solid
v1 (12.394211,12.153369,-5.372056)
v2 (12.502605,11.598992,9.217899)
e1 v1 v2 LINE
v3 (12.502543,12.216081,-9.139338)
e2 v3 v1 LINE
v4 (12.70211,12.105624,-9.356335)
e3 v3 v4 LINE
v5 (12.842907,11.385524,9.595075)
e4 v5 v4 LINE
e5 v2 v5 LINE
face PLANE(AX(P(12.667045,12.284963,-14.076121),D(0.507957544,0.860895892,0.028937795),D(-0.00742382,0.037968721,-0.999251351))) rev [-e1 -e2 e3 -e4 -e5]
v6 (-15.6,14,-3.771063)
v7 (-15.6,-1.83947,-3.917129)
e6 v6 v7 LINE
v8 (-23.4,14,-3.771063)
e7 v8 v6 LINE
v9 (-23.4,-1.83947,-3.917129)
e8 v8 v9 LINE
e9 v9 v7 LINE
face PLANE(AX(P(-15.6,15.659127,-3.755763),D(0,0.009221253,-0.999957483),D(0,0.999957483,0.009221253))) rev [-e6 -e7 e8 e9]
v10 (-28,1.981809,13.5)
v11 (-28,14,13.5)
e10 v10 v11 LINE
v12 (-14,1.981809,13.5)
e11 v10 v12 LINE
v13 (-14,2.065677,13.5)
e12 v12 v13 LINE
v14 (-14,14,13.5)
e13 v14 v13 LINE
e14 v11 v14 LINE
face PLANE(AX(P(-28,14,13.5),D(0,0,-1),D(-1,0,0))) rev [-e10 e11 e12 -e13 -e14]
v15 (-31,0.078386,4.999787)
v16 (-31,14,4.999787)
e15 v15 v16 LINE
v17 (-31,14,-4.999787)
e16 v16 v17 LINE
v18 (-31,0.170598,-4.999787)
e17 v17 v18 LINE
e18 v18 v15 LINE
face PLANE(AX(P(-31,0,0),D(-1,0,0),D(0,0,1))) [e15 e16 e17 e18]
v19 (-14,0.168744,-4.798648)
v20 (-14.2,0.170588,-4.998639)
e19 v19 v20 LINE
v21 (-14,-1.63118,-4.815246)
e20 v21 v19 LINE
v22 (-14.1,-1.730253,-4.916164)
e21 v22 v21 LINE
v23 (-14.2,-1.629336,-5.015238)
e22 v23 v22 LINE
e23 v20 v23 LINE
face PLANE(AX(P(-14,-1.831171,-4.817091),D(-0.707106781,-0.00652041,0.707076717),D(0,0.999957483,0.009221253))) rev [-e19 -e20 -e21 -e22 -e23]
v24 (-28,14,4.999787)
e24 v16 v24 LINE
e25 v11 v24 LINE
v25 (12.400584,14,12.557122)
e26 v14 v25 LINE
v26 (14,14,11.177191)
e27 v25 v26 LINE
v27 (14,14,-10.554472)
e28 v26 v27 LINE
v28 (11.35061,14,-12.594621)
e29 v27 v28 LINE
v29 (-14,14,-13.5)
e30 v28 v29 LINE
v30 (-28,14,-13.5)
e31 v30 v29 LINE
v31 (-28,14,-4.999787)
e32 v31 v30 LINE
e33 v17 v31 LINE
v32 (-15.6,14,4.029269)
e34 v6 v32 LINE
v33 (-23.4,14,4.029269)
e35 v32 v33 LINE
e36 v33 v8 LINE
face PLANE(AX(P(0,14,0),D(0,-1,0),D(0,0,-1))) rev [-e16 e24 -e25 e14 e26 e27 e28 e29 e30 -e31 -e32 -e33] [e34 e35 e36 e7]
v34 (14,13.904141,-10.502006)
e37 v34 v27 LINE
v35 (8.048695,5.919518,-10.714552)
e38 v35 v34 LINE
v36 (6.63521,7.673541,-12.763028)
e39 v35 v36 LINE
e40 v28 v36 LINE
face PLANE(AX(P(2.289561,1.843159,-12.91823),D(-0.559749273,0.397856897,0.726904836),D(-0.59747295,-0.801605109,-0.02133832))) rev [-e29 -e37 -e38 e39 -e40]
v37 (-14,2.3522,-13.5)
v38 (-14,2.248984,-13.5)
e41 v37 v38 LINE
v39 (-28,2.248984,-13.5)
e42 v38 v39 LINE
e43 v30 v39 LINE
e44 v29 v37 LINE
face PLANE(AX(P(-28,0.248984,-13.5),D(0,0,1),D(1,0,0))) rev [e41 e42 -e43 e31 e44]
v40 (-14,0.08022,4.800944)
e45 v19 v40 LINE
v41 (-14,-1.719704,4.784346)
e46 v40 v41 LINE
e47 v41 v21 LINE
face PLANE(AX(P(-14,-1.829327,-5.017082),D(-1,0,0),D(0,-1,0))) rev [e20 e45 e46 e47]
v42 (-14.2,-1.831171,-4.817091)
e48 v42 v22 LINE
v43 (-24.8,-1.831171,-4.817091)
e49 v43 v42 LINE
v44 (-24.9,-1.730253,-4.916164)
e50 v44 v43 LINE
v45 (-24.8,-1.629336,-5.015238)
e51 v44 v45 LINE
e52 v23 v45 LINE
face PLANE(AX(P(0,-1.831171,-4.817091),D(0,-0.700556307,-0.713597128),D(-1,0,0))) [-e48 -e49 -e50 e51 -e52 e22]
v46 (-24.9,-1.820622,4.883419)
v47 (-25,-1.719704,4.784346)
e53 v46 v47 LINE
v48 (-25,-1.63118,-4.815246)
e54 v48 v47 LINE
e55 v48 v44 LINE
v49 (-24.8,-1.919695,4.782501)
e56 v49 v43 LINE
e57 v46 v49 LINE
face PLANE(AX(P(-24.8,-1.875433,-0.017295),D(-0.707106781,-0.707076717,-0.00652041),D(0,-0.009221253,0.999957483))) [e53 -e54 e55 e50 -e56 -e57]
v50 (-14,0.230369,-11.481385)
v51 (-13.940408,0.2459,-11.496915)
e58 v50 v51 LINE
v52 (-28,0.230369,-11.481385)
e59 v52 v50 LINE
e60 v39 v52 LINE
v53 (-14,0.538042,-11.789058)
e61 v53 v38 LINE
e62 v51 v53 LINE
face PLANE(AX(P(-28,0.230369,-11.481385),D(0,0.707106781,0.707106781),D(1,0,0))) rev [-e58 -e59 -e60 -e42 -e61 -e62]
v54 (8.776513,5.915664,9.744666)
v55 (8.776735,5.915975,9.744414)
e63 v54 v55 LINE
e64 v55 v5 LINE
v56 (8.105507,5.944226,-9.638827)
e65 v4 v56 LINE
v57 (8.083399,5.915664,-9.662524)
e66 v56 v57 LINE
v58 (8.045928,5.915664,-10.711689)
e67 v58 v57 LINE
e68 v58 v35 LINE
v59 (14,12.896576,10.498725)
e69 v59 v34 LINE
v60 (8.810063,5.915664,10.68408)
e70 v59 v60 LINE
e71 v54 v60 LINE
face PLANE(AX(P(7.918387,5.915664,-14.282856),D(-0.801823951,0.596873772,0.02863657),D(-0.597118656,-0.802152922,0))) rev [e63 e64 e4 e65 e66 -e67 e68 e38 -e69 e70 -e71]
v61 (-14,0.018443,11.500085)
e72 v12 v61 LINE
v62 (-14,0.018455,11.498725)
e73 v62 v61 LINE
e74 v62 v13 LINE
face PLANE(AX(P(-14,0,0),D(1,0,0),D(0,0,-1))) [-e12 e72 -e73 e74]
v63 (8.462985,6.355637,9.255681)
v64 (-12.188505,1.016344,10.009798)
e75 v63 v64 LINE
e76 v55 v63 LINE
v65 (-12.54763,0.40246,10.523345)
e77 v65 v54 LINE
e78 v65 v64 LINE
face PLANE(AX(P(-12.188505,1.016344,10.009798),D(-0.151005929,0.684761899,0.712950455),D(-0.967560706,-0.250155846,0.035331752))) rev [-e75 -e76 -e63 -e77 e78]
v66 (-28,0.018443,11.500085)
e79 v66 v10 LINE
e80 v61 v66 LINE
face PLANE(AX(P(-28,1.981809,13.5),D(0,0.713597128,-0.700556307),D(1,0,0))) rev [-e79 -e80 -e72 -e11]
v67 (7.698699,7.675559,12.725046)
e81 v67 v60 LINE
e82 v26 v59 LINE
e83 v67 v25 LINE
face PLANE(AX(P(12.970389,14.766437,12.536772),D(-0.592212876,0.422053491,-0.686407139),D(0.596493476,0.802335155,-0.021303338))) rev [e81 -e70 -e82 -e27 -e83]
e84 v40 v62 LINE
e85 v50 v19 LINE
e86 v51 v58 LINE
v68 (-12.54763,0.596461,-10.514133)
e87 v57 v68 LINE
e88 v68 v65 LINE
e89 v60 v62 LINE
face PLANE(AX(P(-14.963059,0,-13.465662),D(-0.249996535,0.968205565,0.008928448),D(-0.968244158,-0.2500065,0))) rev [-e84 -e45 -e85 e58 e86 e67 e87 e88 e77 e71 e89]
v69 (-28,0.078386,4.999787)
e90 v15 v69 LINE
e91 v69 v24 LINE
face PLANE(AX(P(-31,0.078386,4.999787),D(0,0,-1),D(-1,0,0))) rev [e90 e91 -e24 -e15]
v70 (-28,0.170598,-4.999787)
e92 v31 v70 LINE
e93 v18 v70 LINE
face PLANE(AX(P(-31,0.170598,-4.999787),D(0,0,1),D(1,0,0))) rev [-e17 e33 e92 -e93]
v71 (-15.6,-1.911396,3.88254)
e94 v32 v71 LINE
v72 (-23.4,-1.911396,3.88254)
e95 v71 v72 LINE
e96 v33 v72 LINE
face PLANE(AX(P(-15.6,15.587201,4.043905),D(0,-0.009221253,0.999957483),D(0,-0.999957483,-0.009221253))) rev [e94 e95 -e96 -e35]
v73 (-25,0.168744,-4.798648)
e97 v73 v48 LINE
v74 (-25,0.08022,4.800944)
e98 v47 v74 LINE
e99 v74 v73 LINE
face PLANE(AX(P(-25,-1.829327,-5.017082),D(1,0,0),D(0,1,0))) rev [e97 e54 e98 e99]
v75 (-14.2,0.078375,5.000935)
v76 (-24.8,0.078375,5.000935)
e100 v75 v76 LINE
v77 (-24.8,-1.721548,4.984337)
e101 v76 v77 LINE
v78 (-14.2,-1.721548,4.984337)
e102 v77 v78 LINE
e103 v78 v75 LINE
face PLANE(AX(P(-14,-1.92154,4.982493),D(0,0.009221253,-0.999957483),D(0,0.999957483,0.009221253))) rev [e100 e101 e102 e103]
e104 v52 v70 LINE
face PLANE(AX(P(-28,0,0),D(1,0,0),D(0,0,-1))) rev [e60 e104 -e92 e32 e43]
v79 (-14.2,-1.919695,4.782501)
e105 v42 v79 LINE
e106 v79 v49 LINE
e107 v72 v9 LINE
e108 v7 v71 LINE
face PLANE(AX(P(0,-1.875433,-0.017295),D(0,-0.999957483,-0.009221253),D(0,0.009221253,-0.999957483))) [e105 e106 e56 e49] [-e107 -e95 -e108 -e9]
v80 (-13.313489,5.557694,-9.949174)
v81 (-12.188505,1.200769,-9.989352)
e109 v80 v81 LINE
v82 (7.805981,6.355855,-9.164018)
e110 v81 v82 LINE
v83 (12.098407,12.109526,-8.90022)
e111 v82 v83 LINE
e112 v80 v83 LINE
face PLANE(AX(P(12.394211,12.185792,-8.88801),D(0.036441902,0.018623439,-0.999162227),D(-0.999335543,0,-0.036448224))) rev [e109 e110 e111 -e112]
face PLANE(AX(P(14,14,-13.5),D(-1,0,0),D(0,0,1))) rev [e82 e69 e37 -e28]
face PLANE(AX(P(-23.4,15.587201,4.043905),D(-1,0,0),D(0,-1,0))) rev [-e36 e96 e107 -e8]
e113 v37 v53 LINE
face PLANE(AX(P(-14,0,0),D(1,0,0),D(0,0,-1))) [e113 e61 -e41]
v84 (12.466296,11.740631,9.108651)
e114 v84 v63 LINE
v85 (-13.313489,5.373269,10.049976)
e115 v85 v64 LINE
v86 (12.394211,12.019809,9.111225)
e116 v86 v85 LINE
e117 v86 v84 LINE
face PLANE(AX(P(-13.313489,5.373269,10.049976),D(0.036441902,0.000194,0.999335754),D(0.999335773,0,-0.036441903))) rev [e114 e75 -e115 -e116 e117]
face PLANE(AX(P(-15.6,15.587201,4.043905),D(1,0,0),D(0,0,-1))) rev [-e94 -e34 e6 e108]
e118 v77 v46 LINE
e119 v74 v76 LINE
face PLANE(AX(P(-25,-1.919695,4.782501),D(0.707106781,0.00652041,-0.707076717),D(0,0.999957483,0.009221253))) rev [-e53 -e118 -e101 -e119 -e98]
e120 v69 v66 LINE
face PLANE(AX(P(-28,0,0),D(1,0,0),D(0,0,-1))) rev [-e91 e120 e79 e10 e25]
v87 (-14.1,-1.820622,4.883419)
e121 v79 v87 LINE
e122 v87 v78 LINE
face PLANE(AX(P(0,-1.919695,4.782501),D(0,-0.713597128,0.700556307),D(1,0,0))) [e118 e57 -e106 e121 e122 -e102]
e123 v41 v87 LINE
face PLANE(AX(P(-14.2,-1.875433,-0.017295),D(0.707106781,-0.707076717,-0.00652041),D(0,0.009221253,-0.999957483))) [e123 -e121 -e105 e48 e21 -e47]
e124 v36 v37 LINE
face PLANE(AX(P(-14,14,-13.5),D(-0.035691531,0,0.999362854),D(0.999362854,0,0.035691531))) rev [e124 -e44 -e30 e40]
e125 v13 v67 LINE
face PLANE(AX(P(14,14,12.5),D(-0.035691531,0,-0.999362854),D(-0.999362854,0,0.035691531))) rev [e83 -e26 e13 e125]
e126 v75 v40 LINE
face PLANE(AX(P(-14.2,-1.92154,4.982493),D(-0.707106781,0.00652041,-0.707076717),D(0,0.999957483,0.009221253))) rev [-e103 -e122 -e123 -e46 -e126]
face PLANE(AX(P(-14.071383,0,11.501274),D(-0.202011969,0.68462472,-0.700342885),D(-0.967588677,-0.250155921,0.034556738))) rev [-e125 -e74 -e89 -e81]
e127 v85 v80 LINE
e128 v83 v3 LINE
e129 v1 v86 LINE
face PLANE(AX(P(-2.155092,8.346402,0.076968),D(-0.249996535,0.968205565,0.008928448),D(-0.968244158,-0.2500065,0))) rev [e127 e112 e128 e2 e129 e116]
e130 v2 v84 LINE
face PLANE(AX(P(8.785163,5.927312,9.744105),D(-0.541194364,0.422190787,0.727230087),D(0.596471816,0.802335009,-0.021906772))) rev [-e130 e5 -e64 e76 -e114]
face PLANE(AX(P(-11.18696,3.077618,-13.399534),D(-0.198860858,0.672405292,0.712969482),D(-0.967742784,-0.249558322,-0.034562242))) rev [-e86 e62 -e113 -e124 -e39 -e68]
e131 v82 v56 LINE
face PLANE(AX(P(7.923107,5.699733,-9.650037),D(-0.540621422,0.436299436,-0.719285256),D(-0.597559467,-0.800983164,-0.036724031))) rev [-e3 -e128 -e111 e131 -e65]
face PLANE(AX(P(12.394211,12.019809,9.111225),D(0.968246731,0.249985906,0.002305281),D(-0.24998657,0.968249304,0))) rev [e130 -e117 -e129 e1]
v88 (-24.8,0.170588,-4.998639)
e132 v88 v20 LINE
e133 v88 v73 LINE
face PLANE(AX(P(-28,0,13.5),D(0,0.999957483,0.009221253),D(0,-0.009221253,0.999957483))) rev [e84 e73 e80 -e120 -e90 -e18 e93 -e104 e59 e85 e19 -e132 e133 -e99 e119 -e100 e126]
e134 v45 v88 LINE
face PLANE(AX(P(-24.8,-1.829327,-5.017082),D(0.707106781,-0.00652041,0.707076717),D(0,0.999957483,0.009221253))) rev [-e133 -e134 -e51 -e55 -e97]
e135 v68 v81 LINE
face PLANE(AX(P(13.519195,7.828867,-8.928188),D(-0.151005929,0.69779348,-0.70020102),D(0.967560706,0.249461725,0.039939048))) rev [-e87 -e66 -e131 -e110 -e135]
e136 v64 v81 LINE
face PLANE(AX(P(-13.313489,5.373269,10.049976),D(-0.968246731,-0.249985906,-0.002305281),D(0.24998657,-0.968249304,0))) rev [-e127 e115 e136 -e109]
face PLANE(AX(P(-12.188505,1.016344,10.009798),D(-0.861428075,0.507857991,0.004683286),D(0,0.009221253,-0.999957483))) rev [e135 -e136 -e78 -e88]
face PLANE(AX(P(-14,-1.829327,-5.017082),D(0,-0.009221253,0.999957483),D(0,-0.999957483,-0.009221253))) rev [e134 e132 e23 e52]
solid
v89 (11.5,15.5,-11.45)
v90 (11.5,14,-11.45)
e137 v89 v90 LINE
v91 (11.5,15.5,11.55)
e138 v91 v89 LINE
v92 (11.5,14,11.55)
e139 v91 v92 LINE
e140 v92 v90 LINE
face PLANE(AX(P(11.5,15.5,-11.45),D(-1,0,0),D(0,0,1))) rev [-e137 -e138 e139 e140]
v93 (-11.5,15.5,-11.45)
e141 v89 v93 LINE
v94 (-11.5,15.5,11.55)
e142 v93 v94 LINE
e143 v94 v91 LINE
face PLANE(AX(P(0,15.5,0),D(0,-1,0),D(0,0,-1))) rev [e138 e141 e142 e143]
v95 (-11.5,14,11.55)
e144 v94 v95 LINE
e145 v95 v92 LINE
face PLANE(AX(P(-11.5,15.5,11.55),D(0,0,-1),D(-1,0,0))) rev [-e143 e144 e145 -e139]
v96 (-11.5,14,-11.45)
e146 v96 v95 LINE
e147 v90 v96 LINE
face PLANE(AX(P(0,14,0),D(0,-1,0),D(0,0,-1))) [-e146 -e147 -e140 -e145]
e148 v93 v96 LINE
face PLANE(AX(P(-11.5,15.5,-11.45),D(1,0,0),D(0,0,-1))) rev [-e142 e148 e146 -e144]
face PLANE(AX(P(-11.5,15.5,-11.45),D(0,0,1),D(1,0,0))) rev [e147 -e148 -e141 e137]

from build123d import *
from OCP.BRepFilletAPI import BRepFilletAPI_MakeChamfer

# Parameters (mm, degrees)
SKETCH2_W               = 28
SKETCH2_H               = 27
BOSS_EXTRUDE1_DEPTH     = 14
CUT_EXTRUDE1_DEPTH      = 24.963513933
CUT_EXTRUDE1_DEPTH_BACK = 24.963513933
CUT_EXTRUDE2_DEPTH      = 34.265162244
CUT_EXTRUDE2_DEPTH_BACK = 34.265162244
CUT_EXTRUDE5_DEPTH      = 5
CHAMFER9_SIZE           = 2
CHAMFER9_SIZE2          = 2.125118495
CHAMFER9_SIZE2_2        = 2.036669754
CHAMFER10_SIZE          = 0.5
CHAMFER10_SIZE_2        = 0.499756853
CHAMFER10_SIZE_3        = 0.355609596
CHAMFER10_SIZE_4        = 0.478182949
SKETCH8_W               = 23
SKETCH8_H               = 23
BOSS_EXTRUDE3_DEPTH     = 1.5
BOSS_EXTRUDE4_DEPTH     = 14
CHAMFER11_SIZE          = 1.981809494
CHAMFER11_SIZE_2        = 2
CHAMFER11_SIZE_3        = 2.018700778
SKETCH11_W              = 11
SKETCH11_H              = 10
BOSS_EXTRUDE5_DEPTH     = 2
CUT_EXTRUDE6_DEPTH      = 36.61773346
CUT_EXTRUDE6_DEPTH_BACK = 36.61773346
SKETCH12_W              = 7.8
SKETCH12_H              = 7.8
BOSS_EXTRUDE6_DEPTH     = 3
CHAMFER13_SIZE          = 0.2
CHAMFER14_SIZE          = 0.2


with BuildPart() as part:
    # Sketch2 → Boss-Extrude1 (new body)
    with BuildSketch(Plane(origin=(0, 0, 0), x_dir=(1, 0, 0), z_dir=(0, 1, 0))):
        Rectangle(SKETCH2_W, SKETCH2_H)
    extrude(amount=BOSS_EXTRUDE1_DEPTH)

    # Sketch3 → Cut-Extrude1 (cut, two sides: drawn at the far end of the back side and taken through both)
    with BuildSketch(Plane.XZ.offset(-CUT_EXTRUDE1_DEPTH_BACK)):
        Polygon((14, 12.5), (-14, 13.5), (14, 13.5), align=None)
        Polygon((-14, -13.5), (14, -12.5), (14, -13.5), align=None)
    extrude(amount=CUT_EXTRUDE1_DEPTH + CUT_EXTRUDE1_DEPTH_BACK, mode=Mode.SUBTRACT)

    # Sketch4 → Cut-Extrude2 (cut, two sides: drawn at the far end of the back side and taken through both)
    with BuildSketch(Plane(origin=(0.463694268, 0, 12.98343949), x_dir=(0.9993628543475497, 0, -0.03569153051241239), z_dir=(0.03569153051241239, 0, 0.9993628543475497)).offset(-CUT_EXTRUDE2_DEPTH_BACK)):
        Polygon((4.393476436, 0), (13.544935829, 0), (14.437224092, 0), (14.437224092, 3.200858801), (14.437224092, 14), (8.423118558, 5.915663704), (-14.472915623, 0), align=None)
    extrude(amount=CUT_EXTRUDE2_DEPTH + CUT_EXTRUDE2_DEPTH_BACK, mode=Mode.SUBTRACT)

    # Sketch7 → Cut-Extrude5 (cut)
    with BuildSketch(Plane(origin=(-0.90510884, 3.505374242, 0.032325316), x_dir=(0.9682467311609488, 0.2499859061521866, 0.002305281199245587), z_dir=(0.24999653516826476, -0.9682055645501146, -0.00892844768458086))):
        Polygon((-11.52433294, 10), (-11.52433294, -10), (15.026440907, -9), (15.026440907, 9), align=None)
    extrude(amount=-CUT_EXTRUDE5_DEPTH, mode=Mode.SUBTRACT)

    # Chamfer9: one chamfer whose edges measure the first distance from different faces: ONE call of the kernel's chamfer builder (chamfer() names one face for all edges)
    chamfer9_edges_1 = [part.edges().sort_by_distance(p)[0] for p in [
        (10.987187207, 9.957831852, -12.607600457),
    ]]
    chamfer9_side_1 = [part.faces().sort_by_distance(p)[0] for p in [
        (8.200833453, 6.134911733, -10.944147911),
    ]]
    chamfer9_edges_2 = [part.edges().sort_by_distance(p)[0] for p in [
        (-3.012812793, 3.082324055, -13.107600457),
    ]]
    chamfer9_side_2 = [part.faces().sort_by_distance(p)[0] for p in [
        (8.472861151, 5.825901441, 10.976294715),
    ]]
    chamfer9_edges_3 = [part.edges().sort_by_distance(p)[0] for p in [
        (11.440723036, 9.358111881, 12.591402749),
        (-2.559276964, 2.957831852, 13.091402749),
    ]]
    chamfer9 = BRepFilletAPI_MakeChamfer(part.part.solid().wrapped)
    for e in chamfer9_edges_1:
        chamfer9.Add(CHAMFER9_SIZE, CHAMFER9_SIZE2, e.wrapped, chamfer9_side_1[0].wrapped)  # the first distance lies on this face
    for e in chamfer9_edges_2:
        chamfer9.Add(CHAMFER9_SIZE, CHAMFER9_SIZE2_2, e.wrapped, chamfer9_side_2[0].wrapped)  # the first distance lies on this face
    for e in chamfer9_edges_3:
        chamfer9.Add(CHAMFER9_SIZE, e.wrapped)
    add(Compound.cast(chamfer9.Shape()), mode=Mode.REPLACE)

    # Chamfer10
    # the kernel refuses this chamfer: 0.5, 0.499756853, 0.478182949, 0.355609596 mm, written as the material it takes off along each edge
    with BuildSketch(Plane(origin=(13.393805694, 12.150550502, 9.074748342), x_dir=(0.05808492213468299, -0.0159272826215481, 0.9981845838766), z_dir=(-0.5964718159494269, -0.8023350086458182, 0.021906772453014096))) as chamfer10_piece_1_section:
        Polygon((CHAMFER10_SIZE * 0.999621916911, CHAMFER10_SIZE * 0.0274958766106), (-CHAMFER10_SIZE_2 * 0.0270094090309, CHAMFER10_SIZE_2 * 0.99963518004), (0, 0), align=None)
    chamfer10_piece_1 = extrude(amount=9.056768515, mode=Mode.PRIVATE)
    chamfer10_piece_1 = split(chamfer10_piece_1, bisect_by=Plane(origin=(13.194045261, 8.919569719, 9.362412532), z_dir=(-0.9682467311609487, -0.2499859061521866, -0.002305281199245587)), keep=Keep.TOP, mode=Mode.PRIVATE)
    add(chamfer10_piece_1, mode=Mode.SUBTRACT)
    with BuildSketch(Plane(origin=(12.483603901, 11.851435136, -10.17642201), x_dir=(0.6410905937629469, 0.7670777517517646, 0.02438387492033602), z_dir=(0.007423820423546566, -0.03796872134677927, 0.9992513513073723))) as chamfer10_piece_2_section:
        Polygon((CHAMFER10_SIZE_3 * 0.998458969631, CHAMFER10_SIZE_3 * 0.0554949312847), (CHAMFER10_SIZE * 0.582893294976, CHAMFER10_SIZE * 0.812548710338), (0, 0), align=None)
    chamfer10_piece_2 = extrude(amount=20.579624749, mode=Mode.PRIVATE)
    chamfer10_piece_2 = split(chamfer10_piece_2, bisect_by=Plane(origin=(12.913774256, 11.712919177, 9.092338186), z_dir=(-0.03644190228685181, -0.00019400043812537604, -0.9993357544496974)), keep=Keep.TOP, mode=Mode.PRIVATE)
    chamfer10_piece_2 = split(chamfer10_piece_2, bisect_by=Plane(origin=(12.918206265, 11.879748292, -8.874602582), z_dir=(-0.036441902286851825, -0.01862343869573062, 0.9991622267123904)), keep=Keep.TOP, mode=Mode.PRIVATE)
    chamfer10_piece_2 = split(chamfer10_piece_2, bisect_by=Plane(origin=(12.481573161, 12.124794955, 0.172665498), z_dir=(0.24999653516826476, -0.9682055645501146, -0.008928447684580858)), keep=Keep.TOP, mode=Mode.PRIVATE)
    add(chamfer10_piece_2, mode=Mode.SUBTRACT)
    with BuildSketch(Plane(origin=(7.332927257, 4.885726315, -9.208673389), x_dir=(0.02308828920705216, 0.028593105881686263, -0.9993244544178482), z_dir=(0.5975594668303494, 0.8009831640871496, 0.03672403096566061))) as chamfer10_piece_3_section:
        Polygon((CHAMFER10_SIZE_4 * 0.99954799042, CHAMFER10_SIZE_4 * 0.0300634926507), (CHAMFER10_SIZE * 0.0166649416169, CHAMFER10_SIZE * 0.999861130218), (0, 0), align=None)
    chamfer10_piece_3 = extrude(amount=9.921337686, mode=Mode.PRIVATE)
    chamfer10_piece_3 = split(chamfer10_piece_3, bisect_by=Plane(origin=(13.127154568, 9.349828107, -9.200111372), z_dir=(-0.9682467311609487, -0.2499859061521866, -0.002305281199245587)), keep=Keep.TOP, mode=Mode.PRIVATE)
    chamfer10_piece_3 = split(chamfer10_piece_3, bisect_by=Plane(origin=(9.07925667, 11.33256006, -9.181827322), z_dir=(0.24999653516826476, -0.9682055645501146, -0.008928447684580858)), keep=Keep.TOP, mode=Mode.PRIVATE)
    add(chamfer10_piece_3, mode=Mode.SUBTRACT)
    with BuildSketch(Plane(origin=(10.002796446, 6.23732447, 9.199553239), x_dir=(0.04330199810393728, -0.02642773364671087, 0.9987124270051441), z_dir=(-0.9675607061893213, -0.25015584570028293, 0.035331752014273944))) as chamfer10_piece_4_section:
        Polygon((CHAMFER10_SIZE * 0.999621916911, CHAMFER10_SIZE * 0.0274958766106), (-CHAMFER10_SIZE * 0.0274958766106, CHAMFER10_SIZE * 0.999621916911), (0, 0), align=None)
    chamfer10_piece_4 = extrude(amount=24.091958818, mode=Mode.PRIVATE)
    chamfer10_piece_4 = split(chamfer10_piece_4, bisect_by=Plane(origin=(-12.104726667, 0.6943181, 9.74256285), z_dir=(0.9682467311609487, 0.2499859061521866, 0.002305281199245587)), keep=Keep.TOP, mode=Mode.PRIVATE)
    add(chamfer10_piece_4, mode=Mode.SUBTRACT)
    with BuildSketch(Plane(origin=(-12.063506538, 0.520383834, 11.291120145), x_dir=(-0.9610067795621441, -0.27651305144520855, -0.00254990510726875), z_dir=(0, 0.009221252597336898, -0.9999574833464352))) as chamfer10_piece_5_section:
        Polygon((CHAMFER10_SIZE * 0.999621916911, CHAMFER10_SIZE * 0.0274958766106), (-CHAMFER10_SIZE * 0.0274958766106, CHAMFER10_SIZE * 0.999621916911), (0, 0), align=None)
    chamfer10_piece_5 = extrude(amount=22.571682988, mode=Mode.PRIVATE)
    chamfer10_piece_5 = split(chamfer10_piece_5, bisect_by=Plane(origin=(-11.900053771, 0.744779528, 9.999331572), z_dir=(-0.03644190228685181, -0.00019400043812537604, -0.9993357544496974)), keep=Keep.TOP, mode=Mode.PRIVATE)
    chamfer10_piece_5 = split(chamfer10_piece_5, bisect_by=Plane(origin=(-11.900053771, 0.929057753, -9.983896039), z_dir=(-0.036441902286851825, -0.01862343869573062, 0.9991622267123904)), keep=Keep.TOP, mode=Mode.PRIVATE)
    add(chamfer10_piece_5, mode=Mode.SUBTRACT)
    with BuildSketch(Plane(origin=(-13.307636242, 0.395897718, -10.045171631), x_dir=(0.0433019981039377, -0.008005263248046781, -0.9990299558674586), z_dir=(0.9675607061893213, 0.24946172513101106, 0.03993904772377272))) as chamfer10_piece_6_section:
        Polygon((CHAMFER10_SIZE * 0.999621916911, CHAMFER10_SIZE * 0.0274958766106), (-CHAMFER10_SIZE * 0.0274958766106, CHAMFER10_SIZE * 0.999621916911), (0, 0), align=None)
    chamfer10_piece_6 = extrude(amount=23.412546433, mode=Mode.PRIVATE)
    chamfer10_piece_6 = split(chamfer10_piece_6, bisect_by=Plane(origin=(-12.104726559, 0.873987139, -9.740887367), z_dir=(0.9682467311609487, 0.2499859061521866, 0.002305281199245587)), keep=Keep.TOP, mode=Mode.PRIVATE)
    add(chamfer10_piece_6, mode=Mode.SUBTRACT)
    with BuildSketch(Plane(origin=(12.483603901, 11.851435136, -10.17642201), x_dir=(0.6410905937629469, 0.7670777517517646, 0.02438387492033602), z_dir=(0.007423820423546566, -0.03796872134677927, 0.9992513513073723))) as chamfer10_piece_7a_section:
        Polygon((CHAMFER10_SIZE_3 * 0.998458969631, CHAMFER10_SIZE_3 * 0.0554949312847), (CHAMFER10_SIZE * 0.582893294976, CHAMFER10_SIZE * 0.812548710338), (0, 0), align=None)
    chamfer10_piece_7a = extrude(amount=20.579624749, mode=Mode.PRIVATE)
    chamfer10_piece_7a = split(chamfer10_piece_7a, bisect_by=Plane(origin=(12.635030827, 11.348772137, 9.10257357), z_dir=(0.03644190228685181, 0.00019400043812537604, 0.9993357544496974)), keep=Keep.TOP, mode=Mode.PRIVATE)
    with BuildSketch(Plane(origin=(13.393805694, 12.150550502, 9.074748342), x_dir=(0.05808492213468299, -0.0159272826215481, 0.9981845838766), z_dir=(-0.5964718159494269, -0.8023350086458182, 0.021906772453014096))) as chamfer10_piece_7b_section:
        Polygon((CHAMFER10_SIZE * 0.999621916911, CHAMFER10_SIZE * 0.0274958766106), (-CHAMFER10_SIZE_2 * 0.0270094090309, CHAMFER10_SIZE_2 * 0.99963518004), (0, 0), align=None)
    chamfer10_piece_7b = extrude(amount=9.056768515, mode=Mode.PRIVATE)
    chamfer10_piece_7b = split(chamfer10_piece_7b, bisect_by=Plane(origin=(12.487037388, 11.658879354, 9.262321046), z_dir=(0.9682467311609487, 0.2499859061521866, 0.002305281199245587)), keep=Keep.TOP, mode=Mode.PRIVATE)
    chamfer10_piece_7 = chamfer10_piece_7a & chamfer10_piece_7b
    add(chamfer10_piece_7, mode=Mode.SUBTRACT)
    with BuildSketch(Plane(origin=(7.332927257, 4.885726315, -9.208673389), x_dir=(0.02308828920705216, 0.028593105881686263, -0.9993244544178482), z_dir=(0.5975594668303494, 0.8009831640871496, 0.03672403096566061))) as chamfer10_piece_8a_section:
        Polygon((CHAMFER10_SIZE_4 * 0.99954799042, CHAMFER10_SIZE_4 * 0.0300634926507), (CHAMFER10_SIZE * 0.0166649416169, CHAMFER10_SIZE * 0.999861130218), (0, 0), align=None)
    chamfer10_piece_8a = extrude(amount=9.921337686, mode=Mode.PRIVATE)
    chamfer10_piece_8a = split(chamfer10_piece_8a, bisect_by=Plane(origin=(12.430073193, 12.048679653, -9.082159345), z_dir=(0.9682467311609487, 0.2499859061521866, 0.002305281199245587)), keep=Keep.TOP, mode=Mode.PRIVATE)
    chamfer10_piece_8a = split(chamfer10_piece_8a, bisect_by=Plane(origin=(12.566907766, 12.23215797, -9.080467373), z_dir=(0.24999653516826476, -0.9682055645501146, -0.008928447684580858)), keep=Keep.TOP, mode=Mode.PRIVATE)
    with BuildSketch(Plane(origin=(12.483603901, 11.851435136, -10.17642201), x_dir=(0.6410905937629469, 0.7670777517517646, 0.02438387492033602), z_dir=(0.007423820423546566, -0.03796872134677927, 0.9992513513073723))) as chamfer10_piece_8b_section:
        Polygon((CHAMFER10_SIZE_3 * 0.998458969631, CHAMFER10_SIZE_3 * 0.0554949312847), (CHAMFER10_SIZE * 0.582893294976, CHAMFER10_SIZE * 0.812548710338), (0, 0), align=None)
    chamfer10_piece_8b = extrude(amount=20.579624749, mode=Mode.PRIVATE)
    chamfer10_piece_8b = split(chamfer10_piece_8b, bisect_by=Plane(origin=(12.507794791, 12.045003198, -8.886491102), z_dir=(0.036441902286851825, 0.01862343869573062, -0.9991622267123904)), keep=Keep.TOP, mode=Mode.PRIVATE)
    chamfer10_piece_8b = split(chamfer10_piece_8b, bisect_by=Plane(origin=(12.489689166, 12.216249647, -9.517481187), z_dir=(0.24999653516826476, -0.9682055645501146, -0.008928447684580858)), keep=Keep.TOP, mode=Mode.PRIVATE)
    chamfer10_piece_8 = chamfer10_piece_8a & chamfer10_piece_8b
    add(chamfer10_piece_8, mode=Mode.SUBTRACT)
    with BuildSketch(Plane(origin=(10.002796446, 6.23732447, 9.199553239), x_dir=(0.04330199810393728, -0.02642773364671087, 0.9987124270051441), z_dir=(-0.9675607061893213, -0.25015584570028293, 0.035331752014273944))) as chamfer10_piece_9a_section:
        Polygon((CHAMFER10_SIZE * 0.999621916911, CHAMFER10_SIZE * 0.0274958766106), (-CHAMFER10_SIZE * 0.0274958766106, CHAMFER10_SIZE * 0.999621916911), (0, 0), align=None)
    chamfer10_piece_9a = extrude(amount=24.091958818, mode=Mode.PRIVATE)
    chamfer10_piece_9a = split(chamfer10_piece_9a, bisect_by=Plane(origin=(-12.10479262, 0.6903974, 10.195426996), z_dir=(-0.9682467311609487, -0.2499859061521866, -0.002305281199245587)), keep=Keep.TOP, mode=Mode.PRIVATE)
    with BuildSketch(Plane(origin=(-12.063506538, 0.520383834, 11.291120145), x_dir=(-0.9610067795621441, -0.27651305144520855, -0.00254990510726875), z_dir=(0, 0.009221252597336898, -0.9999574833464352))) as chamfer10_piece_9b_section:
        Polygon((CHAMFER10_SIZE * 0.999621916911, CHAMFER10_SIZE * 0.0274958766106), (-CHAMFER10_SIZE * 0.0274958766106, CHAMFER10_SIZE * 0.999621916911), (0, 0), align=None)
    chamfer10_piece_9b = extrude(amount=22.571682988, mode=Mode.PRIVATE)
    chamfer10_piece_9b = split(chamfer10_piece_9b, bisect_by=Plane(origin=(-12.287300879, 0.644950584, 10.013472353), z_dir=(0.03644190228685181, 0.00019400043812537604, 0.9993357544496974)), keep=Keep.TOP, mode=Mode.PRIVATE)
    chamfer10_piece_9 = chamfer10_piece_9a & chamfer10_piece_9b
    add(chamfer10_piece_9, mode=Mode.SUBTRACT)
    with BuildSketch(Plane(origin=(-12.063506538, 0.520383834, 11.291120145), x_dir=(-0.9610067795621441, -0.27651305144520855, -0.00254990510726875), z_dir=(0, 0.009221252597336898, -0.9999574833464352))) as chamfer10_piece_10a_section:
        Polygon((CHAMFER10_SIZE * 0.999621916911, CHAMFER10_SIZE * 0.0274958766106), (-CHAMFER10_SIZE * 0.0274958766106, CHAMFER10_SIZE * 0.999621916911), (0, 0), align=None)
    chamfer10_piece_10a = extrude(amount=22.571682988, mode=Mode.PRIVATE)
    chamfer10_piece_10a = split(chamfer10_piece_10a, bisect_by=Plane(origin=(-12.287300879, 0.829506566, -9.999875433), z_dir=(0.036441902286851825, 0.01862343869573062, -0.9991622267123904)), keep=Keep.TOP, mode=Mode.PRIVATE)
    with BuildSketch(Plane(origin=(-13.307636242, 0.395897718, -10.045171631), x_dir=(0.0433019981039377, -0.008005263248046781, -0.9990299558674586), z_dir=(0.9675607061893213, 0.24946172513101106, 0.03993904772377272))) as chamfer10_piece_10b_section:
        Polygon((CHAMFER10_SIZE * 0.999621916911, CHAMFER10_SIZE * 0.0274958766106), (-CHAMFER10_SIZE * 0.0274958766106, CHAMFER10_SIZE * 0.999621916911), (0, 0), align=None)
    chamfer10_piece_10b = extrude(amount=23.412546433, mode=Mode.PRIVATE)
    chamfer10_piece_10b = split(chamfer10_piece_10b, bisect_by=Plane(origin=(-12.10479262, 0.87830121, -10.180961015), z_dir=(-0.9682467311609487, -0.2499859061521866, -0.002305281199245587)), keep=Keep.TOP, mode=Mode.PRIVATE)
    chamfer10_piece_10 = chamfer10_piece_10a & chamfer10_piece_10b
    add(chamfer10_piece_10, mode=Mode.SUBTRACT)

    # Sketch9 → Boss-Extrude4 (add)
    with BuildSketch(Plane.ZY.offset(14)):
        Polygon((13.5, 14), (13.5, 0), (-13.5, 0.248984406), (-13.5, 14), align=None)
    extrude(amount=BOSS_EXTRUDE4_DEPTH)

    # Chamfer11
    # the kernel refuses this chamfer: 2.018700778, 2, 1.981809494 mm, written as the material it takes off along each edge
    with BuildSketch(Plane(origin=(-8.856634024, 0, 13.5), x_dir=(0, 0.999607847931299, 0.028002684766947932), z_dir=(-1, 0, 0))) as chamfer11_piece_1:
        Polygon((CHAMFER11_SIZE * 0.999607847913, CHAMFER11_SIZE * 0.0280026847664), (-CHAMFER11_SIZE_2 * 0.0187838577224, CHAMFER11_SIZE_2 * 0.99982356778), (0, 0), align=None)
    extrude(amount=24.286731952, mode=Mode.SUBTRACT)
    with BuildSketch(Plane(origin=(-8.807268021, 0.248984406, -13.5), x_dir=(0, 0.9996150154540677, -0.027745646122666685), z_dir=(-1, 0, 0))) as chamfer11_piece_2:
        Polygon((CHAMFER11_SIZE_2 * 0.999615015454, -CHAMFER11_SIZE_2 * 0.0277456461227), (-CHAMFER11_SIZE_3 * 0.0369621690318, -CHAMFER11_SIZE_3 * 0.999316665654), (0, 0), align=None)
    extrude(amount=24.385463958, mode=Mode.SUBTRACT)

    # Sketch11 → Boss-Extrude5 (add)
    with BuildSketch(Plane(origin=(0, 0.124481617, 0.001147925), x_dir=(1, 0, 0), z_dir=(0, -0.9999574833464353, -0.00922125259733687))):
        with Locations((-19.5, 0)):
            Rectangle(SKETCH11_W, SKETCH11_H)
    extrude(amount=BOSS_EXTRUDE5_DEPTH)

    # Sketch12 → Cut-Extrude6 (cut, two sides: drawn at the far end of the back side and taken through both)
    with BuildSketch(Plane(origin=(0, -1.875433349, -0.01729458), x_dir=(1, 0, 0), z_dir=(0, -0.9999574833464353, -0.009221252597336872)).offset(-CUT_EXTRUDE6_DEPTH_BACK)):
        with Locations((-19.5, 0)):
            Rectangle(SKETCH12_W, SKETCH12_H)
    extrude(amount=CUT_EXTRUDE6_DEPTH + CUT_EXTRUDE6_DEPTH_BACK, mode=Mode.SUBTRACT)

    # Sketch13 → Boss-Extrude6 (add)
    with BuildSketch(Plane.ZY.offset(28)):
        Polygon((4.999787417, 0.07838594), (4.999787417, 14), (-4.999787417, 14), (-4.999787417, 0.170598466), align=None)
    extrude(amount=BOSS_EXTRUDE6_DEPTH)

    # Chamfer13
    chamfer13_edges = [part.edges().sort_by_distance(p)[0] for p in [
        (-14, -1.875433349, -0.01729458),
        (-19.5, -1.921539612, 4.982492837),
        (-25, -1.875433349, -0.01729458),
        (-19.5, -1.829327086, -5.017081997),
    ]]
    chamfer(chamfer13_edges, length=CHAMFER13_SIZE)

    # Chamfer14
    chamfer14_edges = [part.edges().sort_by_distance(p)[0] for p in [
        (-25, -0.821586381, 4.992636215),
        (-14, -0.821586381, 4.992636215),
        (-25, -0.729373855, -5.006938619),
        (-14, -0.729373855, -5.006938619),
    ]]
    chamfer(chamfer14_edges, length=CHAMFER14_SIZE)


with BuildPart() as body_2:
    # Sketch8 → Boss-Extrude3 (new body)
    with BuildSketch(Plane(origin=(0, 14, 0), x_dir=(1, 0, 0), z_dir=(0, 1, 0))):
        with Locations((0, -0.05)):
            Rectangle(SKETCH8_W, SKETCH8_H)
    extrude(amount=BOSS_EXTRUDE3_DEPTH)


solid = Compound([part.part, body_2.part])
